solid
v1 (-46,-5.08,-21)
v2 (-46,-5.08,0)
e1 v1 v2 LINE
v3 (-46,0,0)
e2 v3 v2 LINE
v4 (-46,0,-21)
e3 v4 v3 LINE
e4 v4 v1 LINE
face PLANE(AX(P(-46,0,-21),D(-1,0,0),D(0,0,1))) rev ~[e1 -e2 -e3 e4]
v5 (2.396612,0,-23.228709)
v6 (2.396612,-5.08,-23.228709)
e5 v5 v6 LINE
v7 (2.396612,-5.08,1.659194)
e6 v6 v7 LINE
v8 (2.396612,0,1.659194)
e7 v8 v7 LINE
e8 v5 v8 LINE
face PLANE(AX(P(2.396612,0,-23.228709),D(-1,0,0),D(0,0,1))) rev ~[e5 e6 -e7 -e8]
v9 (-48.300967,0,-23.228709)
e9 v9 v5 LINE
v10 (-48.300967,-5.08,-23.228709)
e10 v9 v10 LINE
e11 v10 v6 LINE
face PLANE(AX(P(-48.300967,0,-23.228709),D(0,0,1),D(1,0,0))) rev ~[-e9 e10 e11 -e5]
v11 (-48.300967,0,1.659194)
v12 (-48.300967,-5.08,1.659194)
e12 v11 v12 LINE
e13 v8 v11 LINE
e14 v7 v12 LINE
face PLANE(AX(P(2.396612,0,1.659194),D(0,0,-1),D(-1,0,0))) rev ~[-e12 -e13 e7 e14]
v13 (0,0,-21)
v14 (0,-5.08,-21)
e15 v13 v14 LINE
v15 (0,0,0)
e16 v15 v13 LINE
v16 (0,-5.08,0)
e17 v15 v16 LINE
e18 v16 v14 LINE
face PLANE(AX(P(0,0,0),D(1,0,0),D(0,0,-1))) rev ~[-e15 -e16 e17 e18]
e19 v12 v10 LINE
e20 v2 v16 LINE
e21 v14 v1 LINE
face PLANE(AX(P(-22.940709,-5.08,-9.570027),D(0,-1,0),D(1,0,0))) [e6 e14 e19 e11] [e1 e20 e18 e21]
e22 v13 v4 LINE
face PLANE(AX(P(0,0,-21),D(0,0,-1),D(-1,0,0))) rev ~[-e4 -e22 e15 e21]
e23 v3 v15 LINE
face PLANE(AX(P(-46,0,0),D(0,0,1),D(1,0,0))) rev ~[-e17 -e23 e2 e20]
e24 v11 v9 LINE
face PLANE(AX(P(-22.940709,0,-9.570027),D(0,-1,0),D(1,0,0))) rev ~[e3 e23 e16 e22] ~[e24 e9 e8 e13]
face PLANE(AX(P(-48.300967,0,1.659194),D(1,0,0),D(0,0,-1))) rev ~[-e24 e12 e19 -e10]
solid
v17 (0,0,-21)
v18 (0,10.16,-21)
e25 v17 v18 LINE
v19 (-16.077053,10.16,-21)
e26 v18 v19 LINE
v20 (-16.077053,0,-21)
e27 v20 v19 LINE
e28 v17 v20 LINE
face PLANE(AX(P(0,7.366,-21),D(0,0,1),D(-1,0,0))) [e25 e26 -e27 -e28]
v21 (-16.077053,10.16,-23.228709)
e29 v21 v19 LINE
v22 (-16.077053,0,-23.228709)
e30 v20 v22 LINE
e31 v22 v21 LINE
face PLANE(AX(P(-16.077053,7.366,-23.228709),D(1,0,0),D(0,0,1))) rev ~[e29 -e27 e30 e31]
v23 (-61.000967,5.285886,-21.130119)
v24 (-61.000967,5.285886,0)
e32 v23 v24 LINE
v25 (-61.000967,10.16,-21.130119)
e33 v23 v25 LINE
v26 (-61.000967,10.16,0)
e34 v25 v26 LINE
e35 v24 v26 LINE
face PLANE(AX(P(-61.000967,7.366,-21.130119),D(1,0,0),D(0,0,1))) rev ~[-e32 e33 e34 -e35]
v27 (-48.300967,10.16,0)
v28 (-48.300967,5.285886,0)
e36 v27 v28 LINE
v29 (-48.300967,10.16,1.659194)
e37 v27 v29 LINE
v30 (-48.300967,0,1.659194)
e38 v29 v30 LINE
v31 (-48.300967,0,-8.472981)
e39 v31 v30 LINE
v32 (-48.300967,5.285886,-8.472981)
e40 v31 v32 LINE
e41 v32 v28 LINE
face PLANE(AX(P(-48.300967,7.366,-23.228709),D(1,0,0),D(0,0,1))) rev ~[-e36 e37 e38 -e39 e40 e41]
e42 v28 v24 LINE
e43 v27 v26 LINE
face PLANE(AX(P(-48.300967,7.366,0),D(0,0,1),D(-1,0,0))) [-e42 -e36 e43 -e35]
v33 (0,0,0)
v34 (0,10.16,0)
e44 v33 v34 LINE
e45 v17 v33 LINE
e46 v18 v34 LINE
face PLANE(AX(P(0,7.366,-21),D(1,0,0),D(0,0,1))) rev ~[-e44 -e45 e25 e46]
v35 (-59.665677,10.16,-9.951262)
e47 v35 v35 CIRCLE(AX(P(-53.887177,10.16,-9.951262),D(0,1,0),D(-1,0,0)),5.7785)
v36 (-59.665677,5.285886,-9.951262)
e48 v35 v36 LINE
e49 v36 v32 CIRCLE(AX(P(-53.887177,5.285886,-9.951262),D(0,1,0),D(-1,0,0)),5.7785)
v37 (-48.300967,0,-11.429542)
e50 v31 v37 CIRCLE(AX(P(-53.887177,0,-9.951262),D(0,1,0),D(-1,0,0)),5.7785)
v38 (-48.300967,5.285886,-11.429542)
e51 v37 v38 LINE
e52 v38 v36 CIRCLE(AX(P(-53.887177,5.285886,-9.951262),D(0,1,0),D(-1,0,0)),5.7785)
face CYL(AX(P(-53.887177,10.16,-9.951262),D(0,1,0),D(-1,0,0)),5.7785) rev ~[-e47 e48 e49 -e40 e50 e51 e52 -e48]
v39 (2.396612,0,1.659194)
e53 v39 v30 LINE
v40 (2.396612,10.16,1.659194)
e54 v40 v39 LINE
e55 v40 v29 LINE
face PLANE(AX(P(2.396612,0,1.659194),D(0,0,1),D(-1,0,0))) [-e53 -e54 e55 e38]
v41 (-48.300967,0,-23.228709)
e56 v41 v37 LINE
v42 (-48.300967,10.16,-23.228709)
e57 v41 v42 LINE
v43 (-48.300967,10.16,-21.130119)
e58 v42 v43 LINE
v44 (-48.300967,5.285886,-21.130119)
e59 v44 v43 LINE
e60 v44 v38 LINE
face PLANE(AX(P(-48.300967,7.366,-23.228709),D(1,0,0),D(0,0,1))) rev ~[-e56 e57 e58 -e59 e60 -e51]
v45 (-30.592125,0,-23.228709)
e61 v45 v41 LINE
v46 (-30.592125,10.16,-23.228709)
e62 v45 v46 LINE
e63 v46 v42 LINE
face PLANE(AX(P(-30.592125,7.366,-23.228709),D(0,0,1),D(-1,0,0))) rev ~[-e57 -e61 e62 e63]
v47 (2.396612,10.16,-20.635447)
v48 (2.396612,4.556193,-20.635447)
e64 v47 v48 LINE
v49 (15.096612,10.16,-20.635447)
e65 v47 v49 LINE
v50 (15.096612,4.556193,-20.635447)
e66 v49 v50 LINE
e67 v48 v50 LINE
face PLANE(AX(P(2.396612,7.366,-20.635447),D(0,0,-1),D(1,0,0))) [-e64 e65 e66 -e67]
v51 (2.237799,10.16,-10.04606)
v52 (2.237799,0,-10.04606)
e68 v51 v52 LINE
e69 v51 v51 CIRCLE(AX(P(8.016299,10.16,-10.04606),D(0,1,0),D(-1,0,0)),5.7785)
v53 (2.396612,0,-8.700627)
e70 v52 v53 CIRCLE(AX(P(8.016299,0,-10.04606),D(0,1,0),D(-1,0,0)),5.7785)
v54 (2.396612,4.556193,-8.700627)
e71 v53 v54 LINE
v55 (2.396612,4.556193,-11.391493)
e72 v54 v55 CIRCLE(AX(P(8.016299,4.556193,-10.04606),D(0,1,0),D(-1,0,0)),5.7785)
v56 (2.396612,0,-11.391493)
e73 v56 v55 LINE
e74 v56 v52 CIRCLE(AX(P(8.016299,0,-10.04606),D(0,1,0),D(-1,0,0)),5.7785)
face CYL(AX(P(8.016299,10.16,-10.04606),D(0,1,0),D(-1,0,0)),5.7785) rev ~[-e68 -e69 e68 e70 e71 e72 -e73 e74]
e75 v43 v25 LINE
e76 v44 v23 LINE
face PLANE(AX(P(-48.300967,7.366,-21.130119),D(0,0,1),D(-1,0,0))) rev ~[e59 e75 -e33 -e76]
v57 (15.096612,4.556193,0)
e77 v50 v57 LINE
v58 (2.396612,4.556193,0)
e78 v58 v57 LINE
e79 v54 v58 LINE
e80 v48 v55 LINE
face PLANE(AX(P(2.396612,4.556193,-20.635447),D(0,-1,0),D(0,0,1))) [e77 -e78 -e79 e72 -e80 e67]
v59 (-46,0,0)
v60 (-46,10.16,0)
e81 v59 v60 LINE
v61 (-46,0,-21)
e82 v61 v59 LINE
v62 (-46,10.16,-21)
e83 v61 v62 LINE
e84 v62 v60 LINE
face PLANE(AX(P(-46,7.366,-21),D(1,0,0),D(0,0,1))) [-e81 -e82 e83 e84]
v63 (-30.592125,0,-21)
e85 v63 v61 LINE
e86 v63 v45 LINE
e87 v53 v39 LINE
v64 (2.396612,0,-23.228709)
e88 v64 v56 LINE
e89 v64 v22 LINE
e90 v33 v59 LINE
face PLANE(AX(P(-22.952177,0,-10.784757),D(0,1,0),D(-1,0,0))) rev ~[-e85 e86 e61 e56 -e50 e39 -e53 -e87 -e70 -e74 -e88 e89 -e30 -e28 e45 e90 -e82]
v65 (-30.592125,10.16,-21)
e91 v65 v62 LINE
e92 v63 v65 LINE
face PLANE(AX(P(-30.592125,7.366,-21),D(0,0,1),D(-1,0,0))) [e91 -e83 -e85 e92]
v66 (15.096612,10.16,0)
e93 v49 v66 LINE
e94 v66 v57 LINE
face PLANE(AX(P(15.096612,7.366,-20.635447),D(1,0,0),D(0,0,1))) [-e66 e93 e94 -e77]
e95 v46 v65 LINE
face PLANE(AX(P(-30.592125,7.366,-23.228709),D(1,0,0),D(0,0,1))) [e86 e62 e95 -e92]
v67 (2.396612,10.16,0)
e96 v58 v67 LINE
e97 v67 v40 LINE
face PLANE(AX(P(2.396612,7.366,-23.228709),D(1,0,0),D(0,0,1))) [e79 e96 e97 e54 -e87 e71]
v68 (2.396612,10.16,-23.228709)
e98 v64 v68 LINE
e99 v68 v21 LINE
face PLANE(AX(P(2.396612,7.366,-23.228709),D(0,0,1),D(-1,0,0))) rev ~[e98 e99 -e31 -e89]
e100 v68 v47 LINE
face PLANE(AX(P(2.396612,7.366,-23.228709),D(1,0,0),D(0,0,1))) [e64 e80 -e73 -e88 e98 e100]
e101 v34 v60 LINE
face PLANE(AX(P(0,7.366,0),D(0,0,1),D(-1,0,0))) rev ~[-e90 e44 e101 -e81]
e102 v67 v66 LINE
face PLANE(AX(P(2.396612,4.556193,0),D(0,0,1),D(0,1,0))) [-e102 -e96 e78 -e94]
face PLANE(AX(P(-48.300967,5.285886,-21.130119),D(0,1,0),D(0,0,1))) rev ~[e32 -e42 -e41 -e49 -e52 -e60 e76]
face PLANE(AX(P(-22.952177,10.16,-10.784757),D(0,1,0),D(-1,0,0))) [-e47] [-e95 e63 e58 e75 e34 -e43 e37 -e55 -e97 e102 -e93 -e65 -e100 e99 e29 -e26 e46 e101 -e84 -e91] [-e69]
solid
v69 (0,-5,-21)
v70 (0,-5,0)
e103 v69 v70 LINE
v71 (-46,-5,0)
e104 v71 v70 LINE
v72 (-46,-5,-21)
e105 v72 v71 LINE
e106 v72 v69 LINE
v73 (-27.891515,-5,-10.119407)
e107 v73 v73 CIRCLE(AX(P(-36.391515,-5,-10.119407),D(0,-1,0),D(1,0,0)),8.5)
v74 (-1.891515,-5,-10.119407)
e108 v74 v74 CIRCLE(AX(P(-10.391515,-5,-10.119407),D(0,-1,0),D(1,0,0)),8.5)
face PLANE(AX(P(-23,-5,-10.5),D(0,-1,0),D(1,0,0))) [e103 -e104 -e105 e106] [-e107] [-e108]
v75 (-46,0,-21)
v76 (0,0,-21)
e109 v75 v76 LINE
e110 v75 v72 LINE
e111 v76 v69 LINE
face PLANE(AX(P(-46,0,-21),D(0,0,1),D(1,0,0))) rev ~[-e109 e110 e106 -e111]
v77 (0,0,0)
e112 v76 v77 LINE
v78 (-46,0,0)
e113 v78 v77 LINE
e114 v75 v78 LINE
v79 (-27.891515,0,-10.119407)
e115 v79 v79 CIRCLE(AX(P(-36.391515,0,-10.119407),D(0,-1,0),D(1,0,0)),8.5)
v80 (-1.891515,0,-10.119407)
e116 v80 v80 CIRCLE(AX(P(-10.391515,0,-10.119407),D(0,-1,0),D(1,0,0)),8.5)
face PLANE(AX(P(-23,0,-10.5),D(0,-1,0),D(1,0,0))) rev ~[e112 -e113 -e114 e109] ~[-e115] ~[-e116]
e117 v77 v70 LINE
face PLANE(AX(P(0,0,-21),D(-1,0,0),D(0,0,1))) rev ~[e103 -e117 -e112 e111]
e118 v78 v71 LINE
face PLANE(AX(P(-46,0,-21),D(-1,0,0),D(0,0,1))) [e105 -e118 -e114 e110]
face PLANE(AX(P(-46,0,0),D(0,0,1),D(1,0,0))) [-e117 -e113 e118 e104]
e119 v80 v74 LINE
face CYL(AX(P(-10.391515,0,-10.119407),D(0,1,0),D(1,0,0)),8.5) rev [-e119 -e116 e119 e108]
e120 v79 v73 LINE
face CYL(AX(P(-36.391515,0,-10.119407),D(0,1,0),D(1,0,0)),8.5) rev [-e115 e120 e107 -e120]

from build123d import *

# Parameters (mm, degrees)
F0_W      = 46
F0_H      = 21
F0_R      = 8.5
F1_DEPTH  = 5
F2_W      = 50.6975790486
F2_H      = 24.8879023129
F2_W_2    = 46
F2_H_2    = 21
F3_DEPTH  = 25.4
F4_W      = 14.5150721073
F4_H      = 25.4
F5_DEPTH  = 14.732
F6_W      = 50.6975790486
F6_H      = 24.8879023129
F7_DEPTH  = 10.16
F8_W      = 14.5150721073
F8_H      = 2.2287086546
F9_DEPTH  = 5.08
F10_DEPTH = 7.874
F12_W     = 2.0801138837
F12_H     = 21.1301185191
F14_DEPTH = 12.7
F13_W     = 2.8098069835
F13_H     = 20.6354465336
F15_DEPTH = 12.7
F16_DEPTH = 2.794
F17_R     = 5.7785
F18_DEPTH = 25.4


# Not quite as in the source:
# - a feature of the source that left no trace in its solid (it failed there, or was rolled back) is left out


with BuildPart() as f1:
    # F0 (on Front) → F1 (new body)
    with BuildSketch(Plane.XZ):
        with Locations((-23, -10.5)):
            Rectangle(F0_W, F0_H)
        with Locations((-36.3915145417, -10.1194066999)):
            Circle(F0_R, mode=Mode.SUBTRACT)
        with Locations((-10.3915145417, -10.1194066999)):
            Circle(F0_R, mode=Mode.SUBTRACT)
    extrude(amount=F1_DEPTH)


with BuildPart() as f3:
    # F2 (on face) → F3 (new body)
    with BuildSketch(Plane(origin=(0, 0, 0), x_dir=(-1, 0, 0), z_dir=(0, 1, 0))):
        with Locations((22.9521770962, -10.7847574982)):
            Rectangle(F2_W, F2_H)
        with Locations((23, -10.5)):
            Rectangle(F2_W_2, F2_H_2, mode=Mode.SUBTRACT)
    extrude(amount=F3_DEPTH)

    # F4 (on face) → F5 (cut)
    with BuildSketch(Plane.XY.offset(-21)):
        with Locations((-23.3345888555, 12.7)):
            Rectangle(F4_W, F4_H)
    extrude(amount=-F5_DEPTH, mode=Mode.SUBTRACT)

    # F6 (on face) → F7 (cut)
    with BuildSketch(Plane(origin=(0, 25.4, 0), x_dir=(-1, 0, 0), z_dir=(0, 1, 0))):
        with Locations((22.9521770962, -10.7847574982)):
            Rectangle(F6_W, F6_H)
    extrude(amount=-F7_DEPTH, mode=Mode.SUBTRACT)

    # F10 (cut): a face of the model
    f10_faces = [f3.faces().sort_by_distance(p)[0] for p in [
        (-47.7361965608, 15.24, -10.7847574982),
    ]]
    extrude(f10_faces, amount=-F10_DEPTH, mode=Mode.SUBTRACT)

    # F12 (on face) → F14 (join)
    with BuildSketch(Plane(origin=(-48.3009666204, 0, 0), x_dir=(0, -1, 0), z_dir=(-1, 0, 0))):
        with Locations((-6.3259430582, -10.5650592595)):
            Rectangle(F12_W, F12_H)
    extrude(amount=F14_DEPTH)

    # F13 (on face) → F15 (join)
    with BuildSketch(Plane.YZ.offset(2.3966124281)):
        with Locations((5.9610965082, -10.3177232668)):
            Rectangle(F13_W, F13_H)
    extrude(amount=F15_DEPTH)

    # F16 (add): a face of the model
    f16_faces = [f3.faces().sort_by_distance(p)[0] for p in [
        (-47.5003263005, 7.366, -22.1794135869),
    ]]
    extrude(f16_faces, amount=F16_DEPTH)

    # F17 (on face) → F18 (cut)
    with BuildSketch(Plane(origin=(0, 10.16, 0), x_dir=(-1, 0, 0), z_dir=(0, 1, 0))):
        with Locations((-8.016298525, -10.0460601971)):
            Circle(F17_R)
        with Locations((53.8871772587, -9.9512618035)):
            Circle(F17_R)
    extrude(amount=-F18_DEPTH, mode=Mode.SUBTRACT)


with BuildPart() as f9:
    # F8 (on face) → F9 (new body)
    with BuildSketch(Plane.XZ):
        Polygon((-48.3009666204, 1.6591936583), (-48.3009666204, -23.2287086546), (-30.5921249092, -23.2287086546), (-30.5921249092, -21), (-46, -21), (-46, 0), (0, 0), (0, -21), (-16.0770528018, -21), (-16.0770528018, -23.2287086546), (2.3966124281, -23.2287086546), (2.3966124281, 1.6591936583), align=None)
        with Locations((-23.3345888555, -22.1143543273)):
            Rectangle(F8_W, F8_H)
    extrude(amount=F9_DEPTH)


solid = Compound([f1.part, f3.part, f9.part])
